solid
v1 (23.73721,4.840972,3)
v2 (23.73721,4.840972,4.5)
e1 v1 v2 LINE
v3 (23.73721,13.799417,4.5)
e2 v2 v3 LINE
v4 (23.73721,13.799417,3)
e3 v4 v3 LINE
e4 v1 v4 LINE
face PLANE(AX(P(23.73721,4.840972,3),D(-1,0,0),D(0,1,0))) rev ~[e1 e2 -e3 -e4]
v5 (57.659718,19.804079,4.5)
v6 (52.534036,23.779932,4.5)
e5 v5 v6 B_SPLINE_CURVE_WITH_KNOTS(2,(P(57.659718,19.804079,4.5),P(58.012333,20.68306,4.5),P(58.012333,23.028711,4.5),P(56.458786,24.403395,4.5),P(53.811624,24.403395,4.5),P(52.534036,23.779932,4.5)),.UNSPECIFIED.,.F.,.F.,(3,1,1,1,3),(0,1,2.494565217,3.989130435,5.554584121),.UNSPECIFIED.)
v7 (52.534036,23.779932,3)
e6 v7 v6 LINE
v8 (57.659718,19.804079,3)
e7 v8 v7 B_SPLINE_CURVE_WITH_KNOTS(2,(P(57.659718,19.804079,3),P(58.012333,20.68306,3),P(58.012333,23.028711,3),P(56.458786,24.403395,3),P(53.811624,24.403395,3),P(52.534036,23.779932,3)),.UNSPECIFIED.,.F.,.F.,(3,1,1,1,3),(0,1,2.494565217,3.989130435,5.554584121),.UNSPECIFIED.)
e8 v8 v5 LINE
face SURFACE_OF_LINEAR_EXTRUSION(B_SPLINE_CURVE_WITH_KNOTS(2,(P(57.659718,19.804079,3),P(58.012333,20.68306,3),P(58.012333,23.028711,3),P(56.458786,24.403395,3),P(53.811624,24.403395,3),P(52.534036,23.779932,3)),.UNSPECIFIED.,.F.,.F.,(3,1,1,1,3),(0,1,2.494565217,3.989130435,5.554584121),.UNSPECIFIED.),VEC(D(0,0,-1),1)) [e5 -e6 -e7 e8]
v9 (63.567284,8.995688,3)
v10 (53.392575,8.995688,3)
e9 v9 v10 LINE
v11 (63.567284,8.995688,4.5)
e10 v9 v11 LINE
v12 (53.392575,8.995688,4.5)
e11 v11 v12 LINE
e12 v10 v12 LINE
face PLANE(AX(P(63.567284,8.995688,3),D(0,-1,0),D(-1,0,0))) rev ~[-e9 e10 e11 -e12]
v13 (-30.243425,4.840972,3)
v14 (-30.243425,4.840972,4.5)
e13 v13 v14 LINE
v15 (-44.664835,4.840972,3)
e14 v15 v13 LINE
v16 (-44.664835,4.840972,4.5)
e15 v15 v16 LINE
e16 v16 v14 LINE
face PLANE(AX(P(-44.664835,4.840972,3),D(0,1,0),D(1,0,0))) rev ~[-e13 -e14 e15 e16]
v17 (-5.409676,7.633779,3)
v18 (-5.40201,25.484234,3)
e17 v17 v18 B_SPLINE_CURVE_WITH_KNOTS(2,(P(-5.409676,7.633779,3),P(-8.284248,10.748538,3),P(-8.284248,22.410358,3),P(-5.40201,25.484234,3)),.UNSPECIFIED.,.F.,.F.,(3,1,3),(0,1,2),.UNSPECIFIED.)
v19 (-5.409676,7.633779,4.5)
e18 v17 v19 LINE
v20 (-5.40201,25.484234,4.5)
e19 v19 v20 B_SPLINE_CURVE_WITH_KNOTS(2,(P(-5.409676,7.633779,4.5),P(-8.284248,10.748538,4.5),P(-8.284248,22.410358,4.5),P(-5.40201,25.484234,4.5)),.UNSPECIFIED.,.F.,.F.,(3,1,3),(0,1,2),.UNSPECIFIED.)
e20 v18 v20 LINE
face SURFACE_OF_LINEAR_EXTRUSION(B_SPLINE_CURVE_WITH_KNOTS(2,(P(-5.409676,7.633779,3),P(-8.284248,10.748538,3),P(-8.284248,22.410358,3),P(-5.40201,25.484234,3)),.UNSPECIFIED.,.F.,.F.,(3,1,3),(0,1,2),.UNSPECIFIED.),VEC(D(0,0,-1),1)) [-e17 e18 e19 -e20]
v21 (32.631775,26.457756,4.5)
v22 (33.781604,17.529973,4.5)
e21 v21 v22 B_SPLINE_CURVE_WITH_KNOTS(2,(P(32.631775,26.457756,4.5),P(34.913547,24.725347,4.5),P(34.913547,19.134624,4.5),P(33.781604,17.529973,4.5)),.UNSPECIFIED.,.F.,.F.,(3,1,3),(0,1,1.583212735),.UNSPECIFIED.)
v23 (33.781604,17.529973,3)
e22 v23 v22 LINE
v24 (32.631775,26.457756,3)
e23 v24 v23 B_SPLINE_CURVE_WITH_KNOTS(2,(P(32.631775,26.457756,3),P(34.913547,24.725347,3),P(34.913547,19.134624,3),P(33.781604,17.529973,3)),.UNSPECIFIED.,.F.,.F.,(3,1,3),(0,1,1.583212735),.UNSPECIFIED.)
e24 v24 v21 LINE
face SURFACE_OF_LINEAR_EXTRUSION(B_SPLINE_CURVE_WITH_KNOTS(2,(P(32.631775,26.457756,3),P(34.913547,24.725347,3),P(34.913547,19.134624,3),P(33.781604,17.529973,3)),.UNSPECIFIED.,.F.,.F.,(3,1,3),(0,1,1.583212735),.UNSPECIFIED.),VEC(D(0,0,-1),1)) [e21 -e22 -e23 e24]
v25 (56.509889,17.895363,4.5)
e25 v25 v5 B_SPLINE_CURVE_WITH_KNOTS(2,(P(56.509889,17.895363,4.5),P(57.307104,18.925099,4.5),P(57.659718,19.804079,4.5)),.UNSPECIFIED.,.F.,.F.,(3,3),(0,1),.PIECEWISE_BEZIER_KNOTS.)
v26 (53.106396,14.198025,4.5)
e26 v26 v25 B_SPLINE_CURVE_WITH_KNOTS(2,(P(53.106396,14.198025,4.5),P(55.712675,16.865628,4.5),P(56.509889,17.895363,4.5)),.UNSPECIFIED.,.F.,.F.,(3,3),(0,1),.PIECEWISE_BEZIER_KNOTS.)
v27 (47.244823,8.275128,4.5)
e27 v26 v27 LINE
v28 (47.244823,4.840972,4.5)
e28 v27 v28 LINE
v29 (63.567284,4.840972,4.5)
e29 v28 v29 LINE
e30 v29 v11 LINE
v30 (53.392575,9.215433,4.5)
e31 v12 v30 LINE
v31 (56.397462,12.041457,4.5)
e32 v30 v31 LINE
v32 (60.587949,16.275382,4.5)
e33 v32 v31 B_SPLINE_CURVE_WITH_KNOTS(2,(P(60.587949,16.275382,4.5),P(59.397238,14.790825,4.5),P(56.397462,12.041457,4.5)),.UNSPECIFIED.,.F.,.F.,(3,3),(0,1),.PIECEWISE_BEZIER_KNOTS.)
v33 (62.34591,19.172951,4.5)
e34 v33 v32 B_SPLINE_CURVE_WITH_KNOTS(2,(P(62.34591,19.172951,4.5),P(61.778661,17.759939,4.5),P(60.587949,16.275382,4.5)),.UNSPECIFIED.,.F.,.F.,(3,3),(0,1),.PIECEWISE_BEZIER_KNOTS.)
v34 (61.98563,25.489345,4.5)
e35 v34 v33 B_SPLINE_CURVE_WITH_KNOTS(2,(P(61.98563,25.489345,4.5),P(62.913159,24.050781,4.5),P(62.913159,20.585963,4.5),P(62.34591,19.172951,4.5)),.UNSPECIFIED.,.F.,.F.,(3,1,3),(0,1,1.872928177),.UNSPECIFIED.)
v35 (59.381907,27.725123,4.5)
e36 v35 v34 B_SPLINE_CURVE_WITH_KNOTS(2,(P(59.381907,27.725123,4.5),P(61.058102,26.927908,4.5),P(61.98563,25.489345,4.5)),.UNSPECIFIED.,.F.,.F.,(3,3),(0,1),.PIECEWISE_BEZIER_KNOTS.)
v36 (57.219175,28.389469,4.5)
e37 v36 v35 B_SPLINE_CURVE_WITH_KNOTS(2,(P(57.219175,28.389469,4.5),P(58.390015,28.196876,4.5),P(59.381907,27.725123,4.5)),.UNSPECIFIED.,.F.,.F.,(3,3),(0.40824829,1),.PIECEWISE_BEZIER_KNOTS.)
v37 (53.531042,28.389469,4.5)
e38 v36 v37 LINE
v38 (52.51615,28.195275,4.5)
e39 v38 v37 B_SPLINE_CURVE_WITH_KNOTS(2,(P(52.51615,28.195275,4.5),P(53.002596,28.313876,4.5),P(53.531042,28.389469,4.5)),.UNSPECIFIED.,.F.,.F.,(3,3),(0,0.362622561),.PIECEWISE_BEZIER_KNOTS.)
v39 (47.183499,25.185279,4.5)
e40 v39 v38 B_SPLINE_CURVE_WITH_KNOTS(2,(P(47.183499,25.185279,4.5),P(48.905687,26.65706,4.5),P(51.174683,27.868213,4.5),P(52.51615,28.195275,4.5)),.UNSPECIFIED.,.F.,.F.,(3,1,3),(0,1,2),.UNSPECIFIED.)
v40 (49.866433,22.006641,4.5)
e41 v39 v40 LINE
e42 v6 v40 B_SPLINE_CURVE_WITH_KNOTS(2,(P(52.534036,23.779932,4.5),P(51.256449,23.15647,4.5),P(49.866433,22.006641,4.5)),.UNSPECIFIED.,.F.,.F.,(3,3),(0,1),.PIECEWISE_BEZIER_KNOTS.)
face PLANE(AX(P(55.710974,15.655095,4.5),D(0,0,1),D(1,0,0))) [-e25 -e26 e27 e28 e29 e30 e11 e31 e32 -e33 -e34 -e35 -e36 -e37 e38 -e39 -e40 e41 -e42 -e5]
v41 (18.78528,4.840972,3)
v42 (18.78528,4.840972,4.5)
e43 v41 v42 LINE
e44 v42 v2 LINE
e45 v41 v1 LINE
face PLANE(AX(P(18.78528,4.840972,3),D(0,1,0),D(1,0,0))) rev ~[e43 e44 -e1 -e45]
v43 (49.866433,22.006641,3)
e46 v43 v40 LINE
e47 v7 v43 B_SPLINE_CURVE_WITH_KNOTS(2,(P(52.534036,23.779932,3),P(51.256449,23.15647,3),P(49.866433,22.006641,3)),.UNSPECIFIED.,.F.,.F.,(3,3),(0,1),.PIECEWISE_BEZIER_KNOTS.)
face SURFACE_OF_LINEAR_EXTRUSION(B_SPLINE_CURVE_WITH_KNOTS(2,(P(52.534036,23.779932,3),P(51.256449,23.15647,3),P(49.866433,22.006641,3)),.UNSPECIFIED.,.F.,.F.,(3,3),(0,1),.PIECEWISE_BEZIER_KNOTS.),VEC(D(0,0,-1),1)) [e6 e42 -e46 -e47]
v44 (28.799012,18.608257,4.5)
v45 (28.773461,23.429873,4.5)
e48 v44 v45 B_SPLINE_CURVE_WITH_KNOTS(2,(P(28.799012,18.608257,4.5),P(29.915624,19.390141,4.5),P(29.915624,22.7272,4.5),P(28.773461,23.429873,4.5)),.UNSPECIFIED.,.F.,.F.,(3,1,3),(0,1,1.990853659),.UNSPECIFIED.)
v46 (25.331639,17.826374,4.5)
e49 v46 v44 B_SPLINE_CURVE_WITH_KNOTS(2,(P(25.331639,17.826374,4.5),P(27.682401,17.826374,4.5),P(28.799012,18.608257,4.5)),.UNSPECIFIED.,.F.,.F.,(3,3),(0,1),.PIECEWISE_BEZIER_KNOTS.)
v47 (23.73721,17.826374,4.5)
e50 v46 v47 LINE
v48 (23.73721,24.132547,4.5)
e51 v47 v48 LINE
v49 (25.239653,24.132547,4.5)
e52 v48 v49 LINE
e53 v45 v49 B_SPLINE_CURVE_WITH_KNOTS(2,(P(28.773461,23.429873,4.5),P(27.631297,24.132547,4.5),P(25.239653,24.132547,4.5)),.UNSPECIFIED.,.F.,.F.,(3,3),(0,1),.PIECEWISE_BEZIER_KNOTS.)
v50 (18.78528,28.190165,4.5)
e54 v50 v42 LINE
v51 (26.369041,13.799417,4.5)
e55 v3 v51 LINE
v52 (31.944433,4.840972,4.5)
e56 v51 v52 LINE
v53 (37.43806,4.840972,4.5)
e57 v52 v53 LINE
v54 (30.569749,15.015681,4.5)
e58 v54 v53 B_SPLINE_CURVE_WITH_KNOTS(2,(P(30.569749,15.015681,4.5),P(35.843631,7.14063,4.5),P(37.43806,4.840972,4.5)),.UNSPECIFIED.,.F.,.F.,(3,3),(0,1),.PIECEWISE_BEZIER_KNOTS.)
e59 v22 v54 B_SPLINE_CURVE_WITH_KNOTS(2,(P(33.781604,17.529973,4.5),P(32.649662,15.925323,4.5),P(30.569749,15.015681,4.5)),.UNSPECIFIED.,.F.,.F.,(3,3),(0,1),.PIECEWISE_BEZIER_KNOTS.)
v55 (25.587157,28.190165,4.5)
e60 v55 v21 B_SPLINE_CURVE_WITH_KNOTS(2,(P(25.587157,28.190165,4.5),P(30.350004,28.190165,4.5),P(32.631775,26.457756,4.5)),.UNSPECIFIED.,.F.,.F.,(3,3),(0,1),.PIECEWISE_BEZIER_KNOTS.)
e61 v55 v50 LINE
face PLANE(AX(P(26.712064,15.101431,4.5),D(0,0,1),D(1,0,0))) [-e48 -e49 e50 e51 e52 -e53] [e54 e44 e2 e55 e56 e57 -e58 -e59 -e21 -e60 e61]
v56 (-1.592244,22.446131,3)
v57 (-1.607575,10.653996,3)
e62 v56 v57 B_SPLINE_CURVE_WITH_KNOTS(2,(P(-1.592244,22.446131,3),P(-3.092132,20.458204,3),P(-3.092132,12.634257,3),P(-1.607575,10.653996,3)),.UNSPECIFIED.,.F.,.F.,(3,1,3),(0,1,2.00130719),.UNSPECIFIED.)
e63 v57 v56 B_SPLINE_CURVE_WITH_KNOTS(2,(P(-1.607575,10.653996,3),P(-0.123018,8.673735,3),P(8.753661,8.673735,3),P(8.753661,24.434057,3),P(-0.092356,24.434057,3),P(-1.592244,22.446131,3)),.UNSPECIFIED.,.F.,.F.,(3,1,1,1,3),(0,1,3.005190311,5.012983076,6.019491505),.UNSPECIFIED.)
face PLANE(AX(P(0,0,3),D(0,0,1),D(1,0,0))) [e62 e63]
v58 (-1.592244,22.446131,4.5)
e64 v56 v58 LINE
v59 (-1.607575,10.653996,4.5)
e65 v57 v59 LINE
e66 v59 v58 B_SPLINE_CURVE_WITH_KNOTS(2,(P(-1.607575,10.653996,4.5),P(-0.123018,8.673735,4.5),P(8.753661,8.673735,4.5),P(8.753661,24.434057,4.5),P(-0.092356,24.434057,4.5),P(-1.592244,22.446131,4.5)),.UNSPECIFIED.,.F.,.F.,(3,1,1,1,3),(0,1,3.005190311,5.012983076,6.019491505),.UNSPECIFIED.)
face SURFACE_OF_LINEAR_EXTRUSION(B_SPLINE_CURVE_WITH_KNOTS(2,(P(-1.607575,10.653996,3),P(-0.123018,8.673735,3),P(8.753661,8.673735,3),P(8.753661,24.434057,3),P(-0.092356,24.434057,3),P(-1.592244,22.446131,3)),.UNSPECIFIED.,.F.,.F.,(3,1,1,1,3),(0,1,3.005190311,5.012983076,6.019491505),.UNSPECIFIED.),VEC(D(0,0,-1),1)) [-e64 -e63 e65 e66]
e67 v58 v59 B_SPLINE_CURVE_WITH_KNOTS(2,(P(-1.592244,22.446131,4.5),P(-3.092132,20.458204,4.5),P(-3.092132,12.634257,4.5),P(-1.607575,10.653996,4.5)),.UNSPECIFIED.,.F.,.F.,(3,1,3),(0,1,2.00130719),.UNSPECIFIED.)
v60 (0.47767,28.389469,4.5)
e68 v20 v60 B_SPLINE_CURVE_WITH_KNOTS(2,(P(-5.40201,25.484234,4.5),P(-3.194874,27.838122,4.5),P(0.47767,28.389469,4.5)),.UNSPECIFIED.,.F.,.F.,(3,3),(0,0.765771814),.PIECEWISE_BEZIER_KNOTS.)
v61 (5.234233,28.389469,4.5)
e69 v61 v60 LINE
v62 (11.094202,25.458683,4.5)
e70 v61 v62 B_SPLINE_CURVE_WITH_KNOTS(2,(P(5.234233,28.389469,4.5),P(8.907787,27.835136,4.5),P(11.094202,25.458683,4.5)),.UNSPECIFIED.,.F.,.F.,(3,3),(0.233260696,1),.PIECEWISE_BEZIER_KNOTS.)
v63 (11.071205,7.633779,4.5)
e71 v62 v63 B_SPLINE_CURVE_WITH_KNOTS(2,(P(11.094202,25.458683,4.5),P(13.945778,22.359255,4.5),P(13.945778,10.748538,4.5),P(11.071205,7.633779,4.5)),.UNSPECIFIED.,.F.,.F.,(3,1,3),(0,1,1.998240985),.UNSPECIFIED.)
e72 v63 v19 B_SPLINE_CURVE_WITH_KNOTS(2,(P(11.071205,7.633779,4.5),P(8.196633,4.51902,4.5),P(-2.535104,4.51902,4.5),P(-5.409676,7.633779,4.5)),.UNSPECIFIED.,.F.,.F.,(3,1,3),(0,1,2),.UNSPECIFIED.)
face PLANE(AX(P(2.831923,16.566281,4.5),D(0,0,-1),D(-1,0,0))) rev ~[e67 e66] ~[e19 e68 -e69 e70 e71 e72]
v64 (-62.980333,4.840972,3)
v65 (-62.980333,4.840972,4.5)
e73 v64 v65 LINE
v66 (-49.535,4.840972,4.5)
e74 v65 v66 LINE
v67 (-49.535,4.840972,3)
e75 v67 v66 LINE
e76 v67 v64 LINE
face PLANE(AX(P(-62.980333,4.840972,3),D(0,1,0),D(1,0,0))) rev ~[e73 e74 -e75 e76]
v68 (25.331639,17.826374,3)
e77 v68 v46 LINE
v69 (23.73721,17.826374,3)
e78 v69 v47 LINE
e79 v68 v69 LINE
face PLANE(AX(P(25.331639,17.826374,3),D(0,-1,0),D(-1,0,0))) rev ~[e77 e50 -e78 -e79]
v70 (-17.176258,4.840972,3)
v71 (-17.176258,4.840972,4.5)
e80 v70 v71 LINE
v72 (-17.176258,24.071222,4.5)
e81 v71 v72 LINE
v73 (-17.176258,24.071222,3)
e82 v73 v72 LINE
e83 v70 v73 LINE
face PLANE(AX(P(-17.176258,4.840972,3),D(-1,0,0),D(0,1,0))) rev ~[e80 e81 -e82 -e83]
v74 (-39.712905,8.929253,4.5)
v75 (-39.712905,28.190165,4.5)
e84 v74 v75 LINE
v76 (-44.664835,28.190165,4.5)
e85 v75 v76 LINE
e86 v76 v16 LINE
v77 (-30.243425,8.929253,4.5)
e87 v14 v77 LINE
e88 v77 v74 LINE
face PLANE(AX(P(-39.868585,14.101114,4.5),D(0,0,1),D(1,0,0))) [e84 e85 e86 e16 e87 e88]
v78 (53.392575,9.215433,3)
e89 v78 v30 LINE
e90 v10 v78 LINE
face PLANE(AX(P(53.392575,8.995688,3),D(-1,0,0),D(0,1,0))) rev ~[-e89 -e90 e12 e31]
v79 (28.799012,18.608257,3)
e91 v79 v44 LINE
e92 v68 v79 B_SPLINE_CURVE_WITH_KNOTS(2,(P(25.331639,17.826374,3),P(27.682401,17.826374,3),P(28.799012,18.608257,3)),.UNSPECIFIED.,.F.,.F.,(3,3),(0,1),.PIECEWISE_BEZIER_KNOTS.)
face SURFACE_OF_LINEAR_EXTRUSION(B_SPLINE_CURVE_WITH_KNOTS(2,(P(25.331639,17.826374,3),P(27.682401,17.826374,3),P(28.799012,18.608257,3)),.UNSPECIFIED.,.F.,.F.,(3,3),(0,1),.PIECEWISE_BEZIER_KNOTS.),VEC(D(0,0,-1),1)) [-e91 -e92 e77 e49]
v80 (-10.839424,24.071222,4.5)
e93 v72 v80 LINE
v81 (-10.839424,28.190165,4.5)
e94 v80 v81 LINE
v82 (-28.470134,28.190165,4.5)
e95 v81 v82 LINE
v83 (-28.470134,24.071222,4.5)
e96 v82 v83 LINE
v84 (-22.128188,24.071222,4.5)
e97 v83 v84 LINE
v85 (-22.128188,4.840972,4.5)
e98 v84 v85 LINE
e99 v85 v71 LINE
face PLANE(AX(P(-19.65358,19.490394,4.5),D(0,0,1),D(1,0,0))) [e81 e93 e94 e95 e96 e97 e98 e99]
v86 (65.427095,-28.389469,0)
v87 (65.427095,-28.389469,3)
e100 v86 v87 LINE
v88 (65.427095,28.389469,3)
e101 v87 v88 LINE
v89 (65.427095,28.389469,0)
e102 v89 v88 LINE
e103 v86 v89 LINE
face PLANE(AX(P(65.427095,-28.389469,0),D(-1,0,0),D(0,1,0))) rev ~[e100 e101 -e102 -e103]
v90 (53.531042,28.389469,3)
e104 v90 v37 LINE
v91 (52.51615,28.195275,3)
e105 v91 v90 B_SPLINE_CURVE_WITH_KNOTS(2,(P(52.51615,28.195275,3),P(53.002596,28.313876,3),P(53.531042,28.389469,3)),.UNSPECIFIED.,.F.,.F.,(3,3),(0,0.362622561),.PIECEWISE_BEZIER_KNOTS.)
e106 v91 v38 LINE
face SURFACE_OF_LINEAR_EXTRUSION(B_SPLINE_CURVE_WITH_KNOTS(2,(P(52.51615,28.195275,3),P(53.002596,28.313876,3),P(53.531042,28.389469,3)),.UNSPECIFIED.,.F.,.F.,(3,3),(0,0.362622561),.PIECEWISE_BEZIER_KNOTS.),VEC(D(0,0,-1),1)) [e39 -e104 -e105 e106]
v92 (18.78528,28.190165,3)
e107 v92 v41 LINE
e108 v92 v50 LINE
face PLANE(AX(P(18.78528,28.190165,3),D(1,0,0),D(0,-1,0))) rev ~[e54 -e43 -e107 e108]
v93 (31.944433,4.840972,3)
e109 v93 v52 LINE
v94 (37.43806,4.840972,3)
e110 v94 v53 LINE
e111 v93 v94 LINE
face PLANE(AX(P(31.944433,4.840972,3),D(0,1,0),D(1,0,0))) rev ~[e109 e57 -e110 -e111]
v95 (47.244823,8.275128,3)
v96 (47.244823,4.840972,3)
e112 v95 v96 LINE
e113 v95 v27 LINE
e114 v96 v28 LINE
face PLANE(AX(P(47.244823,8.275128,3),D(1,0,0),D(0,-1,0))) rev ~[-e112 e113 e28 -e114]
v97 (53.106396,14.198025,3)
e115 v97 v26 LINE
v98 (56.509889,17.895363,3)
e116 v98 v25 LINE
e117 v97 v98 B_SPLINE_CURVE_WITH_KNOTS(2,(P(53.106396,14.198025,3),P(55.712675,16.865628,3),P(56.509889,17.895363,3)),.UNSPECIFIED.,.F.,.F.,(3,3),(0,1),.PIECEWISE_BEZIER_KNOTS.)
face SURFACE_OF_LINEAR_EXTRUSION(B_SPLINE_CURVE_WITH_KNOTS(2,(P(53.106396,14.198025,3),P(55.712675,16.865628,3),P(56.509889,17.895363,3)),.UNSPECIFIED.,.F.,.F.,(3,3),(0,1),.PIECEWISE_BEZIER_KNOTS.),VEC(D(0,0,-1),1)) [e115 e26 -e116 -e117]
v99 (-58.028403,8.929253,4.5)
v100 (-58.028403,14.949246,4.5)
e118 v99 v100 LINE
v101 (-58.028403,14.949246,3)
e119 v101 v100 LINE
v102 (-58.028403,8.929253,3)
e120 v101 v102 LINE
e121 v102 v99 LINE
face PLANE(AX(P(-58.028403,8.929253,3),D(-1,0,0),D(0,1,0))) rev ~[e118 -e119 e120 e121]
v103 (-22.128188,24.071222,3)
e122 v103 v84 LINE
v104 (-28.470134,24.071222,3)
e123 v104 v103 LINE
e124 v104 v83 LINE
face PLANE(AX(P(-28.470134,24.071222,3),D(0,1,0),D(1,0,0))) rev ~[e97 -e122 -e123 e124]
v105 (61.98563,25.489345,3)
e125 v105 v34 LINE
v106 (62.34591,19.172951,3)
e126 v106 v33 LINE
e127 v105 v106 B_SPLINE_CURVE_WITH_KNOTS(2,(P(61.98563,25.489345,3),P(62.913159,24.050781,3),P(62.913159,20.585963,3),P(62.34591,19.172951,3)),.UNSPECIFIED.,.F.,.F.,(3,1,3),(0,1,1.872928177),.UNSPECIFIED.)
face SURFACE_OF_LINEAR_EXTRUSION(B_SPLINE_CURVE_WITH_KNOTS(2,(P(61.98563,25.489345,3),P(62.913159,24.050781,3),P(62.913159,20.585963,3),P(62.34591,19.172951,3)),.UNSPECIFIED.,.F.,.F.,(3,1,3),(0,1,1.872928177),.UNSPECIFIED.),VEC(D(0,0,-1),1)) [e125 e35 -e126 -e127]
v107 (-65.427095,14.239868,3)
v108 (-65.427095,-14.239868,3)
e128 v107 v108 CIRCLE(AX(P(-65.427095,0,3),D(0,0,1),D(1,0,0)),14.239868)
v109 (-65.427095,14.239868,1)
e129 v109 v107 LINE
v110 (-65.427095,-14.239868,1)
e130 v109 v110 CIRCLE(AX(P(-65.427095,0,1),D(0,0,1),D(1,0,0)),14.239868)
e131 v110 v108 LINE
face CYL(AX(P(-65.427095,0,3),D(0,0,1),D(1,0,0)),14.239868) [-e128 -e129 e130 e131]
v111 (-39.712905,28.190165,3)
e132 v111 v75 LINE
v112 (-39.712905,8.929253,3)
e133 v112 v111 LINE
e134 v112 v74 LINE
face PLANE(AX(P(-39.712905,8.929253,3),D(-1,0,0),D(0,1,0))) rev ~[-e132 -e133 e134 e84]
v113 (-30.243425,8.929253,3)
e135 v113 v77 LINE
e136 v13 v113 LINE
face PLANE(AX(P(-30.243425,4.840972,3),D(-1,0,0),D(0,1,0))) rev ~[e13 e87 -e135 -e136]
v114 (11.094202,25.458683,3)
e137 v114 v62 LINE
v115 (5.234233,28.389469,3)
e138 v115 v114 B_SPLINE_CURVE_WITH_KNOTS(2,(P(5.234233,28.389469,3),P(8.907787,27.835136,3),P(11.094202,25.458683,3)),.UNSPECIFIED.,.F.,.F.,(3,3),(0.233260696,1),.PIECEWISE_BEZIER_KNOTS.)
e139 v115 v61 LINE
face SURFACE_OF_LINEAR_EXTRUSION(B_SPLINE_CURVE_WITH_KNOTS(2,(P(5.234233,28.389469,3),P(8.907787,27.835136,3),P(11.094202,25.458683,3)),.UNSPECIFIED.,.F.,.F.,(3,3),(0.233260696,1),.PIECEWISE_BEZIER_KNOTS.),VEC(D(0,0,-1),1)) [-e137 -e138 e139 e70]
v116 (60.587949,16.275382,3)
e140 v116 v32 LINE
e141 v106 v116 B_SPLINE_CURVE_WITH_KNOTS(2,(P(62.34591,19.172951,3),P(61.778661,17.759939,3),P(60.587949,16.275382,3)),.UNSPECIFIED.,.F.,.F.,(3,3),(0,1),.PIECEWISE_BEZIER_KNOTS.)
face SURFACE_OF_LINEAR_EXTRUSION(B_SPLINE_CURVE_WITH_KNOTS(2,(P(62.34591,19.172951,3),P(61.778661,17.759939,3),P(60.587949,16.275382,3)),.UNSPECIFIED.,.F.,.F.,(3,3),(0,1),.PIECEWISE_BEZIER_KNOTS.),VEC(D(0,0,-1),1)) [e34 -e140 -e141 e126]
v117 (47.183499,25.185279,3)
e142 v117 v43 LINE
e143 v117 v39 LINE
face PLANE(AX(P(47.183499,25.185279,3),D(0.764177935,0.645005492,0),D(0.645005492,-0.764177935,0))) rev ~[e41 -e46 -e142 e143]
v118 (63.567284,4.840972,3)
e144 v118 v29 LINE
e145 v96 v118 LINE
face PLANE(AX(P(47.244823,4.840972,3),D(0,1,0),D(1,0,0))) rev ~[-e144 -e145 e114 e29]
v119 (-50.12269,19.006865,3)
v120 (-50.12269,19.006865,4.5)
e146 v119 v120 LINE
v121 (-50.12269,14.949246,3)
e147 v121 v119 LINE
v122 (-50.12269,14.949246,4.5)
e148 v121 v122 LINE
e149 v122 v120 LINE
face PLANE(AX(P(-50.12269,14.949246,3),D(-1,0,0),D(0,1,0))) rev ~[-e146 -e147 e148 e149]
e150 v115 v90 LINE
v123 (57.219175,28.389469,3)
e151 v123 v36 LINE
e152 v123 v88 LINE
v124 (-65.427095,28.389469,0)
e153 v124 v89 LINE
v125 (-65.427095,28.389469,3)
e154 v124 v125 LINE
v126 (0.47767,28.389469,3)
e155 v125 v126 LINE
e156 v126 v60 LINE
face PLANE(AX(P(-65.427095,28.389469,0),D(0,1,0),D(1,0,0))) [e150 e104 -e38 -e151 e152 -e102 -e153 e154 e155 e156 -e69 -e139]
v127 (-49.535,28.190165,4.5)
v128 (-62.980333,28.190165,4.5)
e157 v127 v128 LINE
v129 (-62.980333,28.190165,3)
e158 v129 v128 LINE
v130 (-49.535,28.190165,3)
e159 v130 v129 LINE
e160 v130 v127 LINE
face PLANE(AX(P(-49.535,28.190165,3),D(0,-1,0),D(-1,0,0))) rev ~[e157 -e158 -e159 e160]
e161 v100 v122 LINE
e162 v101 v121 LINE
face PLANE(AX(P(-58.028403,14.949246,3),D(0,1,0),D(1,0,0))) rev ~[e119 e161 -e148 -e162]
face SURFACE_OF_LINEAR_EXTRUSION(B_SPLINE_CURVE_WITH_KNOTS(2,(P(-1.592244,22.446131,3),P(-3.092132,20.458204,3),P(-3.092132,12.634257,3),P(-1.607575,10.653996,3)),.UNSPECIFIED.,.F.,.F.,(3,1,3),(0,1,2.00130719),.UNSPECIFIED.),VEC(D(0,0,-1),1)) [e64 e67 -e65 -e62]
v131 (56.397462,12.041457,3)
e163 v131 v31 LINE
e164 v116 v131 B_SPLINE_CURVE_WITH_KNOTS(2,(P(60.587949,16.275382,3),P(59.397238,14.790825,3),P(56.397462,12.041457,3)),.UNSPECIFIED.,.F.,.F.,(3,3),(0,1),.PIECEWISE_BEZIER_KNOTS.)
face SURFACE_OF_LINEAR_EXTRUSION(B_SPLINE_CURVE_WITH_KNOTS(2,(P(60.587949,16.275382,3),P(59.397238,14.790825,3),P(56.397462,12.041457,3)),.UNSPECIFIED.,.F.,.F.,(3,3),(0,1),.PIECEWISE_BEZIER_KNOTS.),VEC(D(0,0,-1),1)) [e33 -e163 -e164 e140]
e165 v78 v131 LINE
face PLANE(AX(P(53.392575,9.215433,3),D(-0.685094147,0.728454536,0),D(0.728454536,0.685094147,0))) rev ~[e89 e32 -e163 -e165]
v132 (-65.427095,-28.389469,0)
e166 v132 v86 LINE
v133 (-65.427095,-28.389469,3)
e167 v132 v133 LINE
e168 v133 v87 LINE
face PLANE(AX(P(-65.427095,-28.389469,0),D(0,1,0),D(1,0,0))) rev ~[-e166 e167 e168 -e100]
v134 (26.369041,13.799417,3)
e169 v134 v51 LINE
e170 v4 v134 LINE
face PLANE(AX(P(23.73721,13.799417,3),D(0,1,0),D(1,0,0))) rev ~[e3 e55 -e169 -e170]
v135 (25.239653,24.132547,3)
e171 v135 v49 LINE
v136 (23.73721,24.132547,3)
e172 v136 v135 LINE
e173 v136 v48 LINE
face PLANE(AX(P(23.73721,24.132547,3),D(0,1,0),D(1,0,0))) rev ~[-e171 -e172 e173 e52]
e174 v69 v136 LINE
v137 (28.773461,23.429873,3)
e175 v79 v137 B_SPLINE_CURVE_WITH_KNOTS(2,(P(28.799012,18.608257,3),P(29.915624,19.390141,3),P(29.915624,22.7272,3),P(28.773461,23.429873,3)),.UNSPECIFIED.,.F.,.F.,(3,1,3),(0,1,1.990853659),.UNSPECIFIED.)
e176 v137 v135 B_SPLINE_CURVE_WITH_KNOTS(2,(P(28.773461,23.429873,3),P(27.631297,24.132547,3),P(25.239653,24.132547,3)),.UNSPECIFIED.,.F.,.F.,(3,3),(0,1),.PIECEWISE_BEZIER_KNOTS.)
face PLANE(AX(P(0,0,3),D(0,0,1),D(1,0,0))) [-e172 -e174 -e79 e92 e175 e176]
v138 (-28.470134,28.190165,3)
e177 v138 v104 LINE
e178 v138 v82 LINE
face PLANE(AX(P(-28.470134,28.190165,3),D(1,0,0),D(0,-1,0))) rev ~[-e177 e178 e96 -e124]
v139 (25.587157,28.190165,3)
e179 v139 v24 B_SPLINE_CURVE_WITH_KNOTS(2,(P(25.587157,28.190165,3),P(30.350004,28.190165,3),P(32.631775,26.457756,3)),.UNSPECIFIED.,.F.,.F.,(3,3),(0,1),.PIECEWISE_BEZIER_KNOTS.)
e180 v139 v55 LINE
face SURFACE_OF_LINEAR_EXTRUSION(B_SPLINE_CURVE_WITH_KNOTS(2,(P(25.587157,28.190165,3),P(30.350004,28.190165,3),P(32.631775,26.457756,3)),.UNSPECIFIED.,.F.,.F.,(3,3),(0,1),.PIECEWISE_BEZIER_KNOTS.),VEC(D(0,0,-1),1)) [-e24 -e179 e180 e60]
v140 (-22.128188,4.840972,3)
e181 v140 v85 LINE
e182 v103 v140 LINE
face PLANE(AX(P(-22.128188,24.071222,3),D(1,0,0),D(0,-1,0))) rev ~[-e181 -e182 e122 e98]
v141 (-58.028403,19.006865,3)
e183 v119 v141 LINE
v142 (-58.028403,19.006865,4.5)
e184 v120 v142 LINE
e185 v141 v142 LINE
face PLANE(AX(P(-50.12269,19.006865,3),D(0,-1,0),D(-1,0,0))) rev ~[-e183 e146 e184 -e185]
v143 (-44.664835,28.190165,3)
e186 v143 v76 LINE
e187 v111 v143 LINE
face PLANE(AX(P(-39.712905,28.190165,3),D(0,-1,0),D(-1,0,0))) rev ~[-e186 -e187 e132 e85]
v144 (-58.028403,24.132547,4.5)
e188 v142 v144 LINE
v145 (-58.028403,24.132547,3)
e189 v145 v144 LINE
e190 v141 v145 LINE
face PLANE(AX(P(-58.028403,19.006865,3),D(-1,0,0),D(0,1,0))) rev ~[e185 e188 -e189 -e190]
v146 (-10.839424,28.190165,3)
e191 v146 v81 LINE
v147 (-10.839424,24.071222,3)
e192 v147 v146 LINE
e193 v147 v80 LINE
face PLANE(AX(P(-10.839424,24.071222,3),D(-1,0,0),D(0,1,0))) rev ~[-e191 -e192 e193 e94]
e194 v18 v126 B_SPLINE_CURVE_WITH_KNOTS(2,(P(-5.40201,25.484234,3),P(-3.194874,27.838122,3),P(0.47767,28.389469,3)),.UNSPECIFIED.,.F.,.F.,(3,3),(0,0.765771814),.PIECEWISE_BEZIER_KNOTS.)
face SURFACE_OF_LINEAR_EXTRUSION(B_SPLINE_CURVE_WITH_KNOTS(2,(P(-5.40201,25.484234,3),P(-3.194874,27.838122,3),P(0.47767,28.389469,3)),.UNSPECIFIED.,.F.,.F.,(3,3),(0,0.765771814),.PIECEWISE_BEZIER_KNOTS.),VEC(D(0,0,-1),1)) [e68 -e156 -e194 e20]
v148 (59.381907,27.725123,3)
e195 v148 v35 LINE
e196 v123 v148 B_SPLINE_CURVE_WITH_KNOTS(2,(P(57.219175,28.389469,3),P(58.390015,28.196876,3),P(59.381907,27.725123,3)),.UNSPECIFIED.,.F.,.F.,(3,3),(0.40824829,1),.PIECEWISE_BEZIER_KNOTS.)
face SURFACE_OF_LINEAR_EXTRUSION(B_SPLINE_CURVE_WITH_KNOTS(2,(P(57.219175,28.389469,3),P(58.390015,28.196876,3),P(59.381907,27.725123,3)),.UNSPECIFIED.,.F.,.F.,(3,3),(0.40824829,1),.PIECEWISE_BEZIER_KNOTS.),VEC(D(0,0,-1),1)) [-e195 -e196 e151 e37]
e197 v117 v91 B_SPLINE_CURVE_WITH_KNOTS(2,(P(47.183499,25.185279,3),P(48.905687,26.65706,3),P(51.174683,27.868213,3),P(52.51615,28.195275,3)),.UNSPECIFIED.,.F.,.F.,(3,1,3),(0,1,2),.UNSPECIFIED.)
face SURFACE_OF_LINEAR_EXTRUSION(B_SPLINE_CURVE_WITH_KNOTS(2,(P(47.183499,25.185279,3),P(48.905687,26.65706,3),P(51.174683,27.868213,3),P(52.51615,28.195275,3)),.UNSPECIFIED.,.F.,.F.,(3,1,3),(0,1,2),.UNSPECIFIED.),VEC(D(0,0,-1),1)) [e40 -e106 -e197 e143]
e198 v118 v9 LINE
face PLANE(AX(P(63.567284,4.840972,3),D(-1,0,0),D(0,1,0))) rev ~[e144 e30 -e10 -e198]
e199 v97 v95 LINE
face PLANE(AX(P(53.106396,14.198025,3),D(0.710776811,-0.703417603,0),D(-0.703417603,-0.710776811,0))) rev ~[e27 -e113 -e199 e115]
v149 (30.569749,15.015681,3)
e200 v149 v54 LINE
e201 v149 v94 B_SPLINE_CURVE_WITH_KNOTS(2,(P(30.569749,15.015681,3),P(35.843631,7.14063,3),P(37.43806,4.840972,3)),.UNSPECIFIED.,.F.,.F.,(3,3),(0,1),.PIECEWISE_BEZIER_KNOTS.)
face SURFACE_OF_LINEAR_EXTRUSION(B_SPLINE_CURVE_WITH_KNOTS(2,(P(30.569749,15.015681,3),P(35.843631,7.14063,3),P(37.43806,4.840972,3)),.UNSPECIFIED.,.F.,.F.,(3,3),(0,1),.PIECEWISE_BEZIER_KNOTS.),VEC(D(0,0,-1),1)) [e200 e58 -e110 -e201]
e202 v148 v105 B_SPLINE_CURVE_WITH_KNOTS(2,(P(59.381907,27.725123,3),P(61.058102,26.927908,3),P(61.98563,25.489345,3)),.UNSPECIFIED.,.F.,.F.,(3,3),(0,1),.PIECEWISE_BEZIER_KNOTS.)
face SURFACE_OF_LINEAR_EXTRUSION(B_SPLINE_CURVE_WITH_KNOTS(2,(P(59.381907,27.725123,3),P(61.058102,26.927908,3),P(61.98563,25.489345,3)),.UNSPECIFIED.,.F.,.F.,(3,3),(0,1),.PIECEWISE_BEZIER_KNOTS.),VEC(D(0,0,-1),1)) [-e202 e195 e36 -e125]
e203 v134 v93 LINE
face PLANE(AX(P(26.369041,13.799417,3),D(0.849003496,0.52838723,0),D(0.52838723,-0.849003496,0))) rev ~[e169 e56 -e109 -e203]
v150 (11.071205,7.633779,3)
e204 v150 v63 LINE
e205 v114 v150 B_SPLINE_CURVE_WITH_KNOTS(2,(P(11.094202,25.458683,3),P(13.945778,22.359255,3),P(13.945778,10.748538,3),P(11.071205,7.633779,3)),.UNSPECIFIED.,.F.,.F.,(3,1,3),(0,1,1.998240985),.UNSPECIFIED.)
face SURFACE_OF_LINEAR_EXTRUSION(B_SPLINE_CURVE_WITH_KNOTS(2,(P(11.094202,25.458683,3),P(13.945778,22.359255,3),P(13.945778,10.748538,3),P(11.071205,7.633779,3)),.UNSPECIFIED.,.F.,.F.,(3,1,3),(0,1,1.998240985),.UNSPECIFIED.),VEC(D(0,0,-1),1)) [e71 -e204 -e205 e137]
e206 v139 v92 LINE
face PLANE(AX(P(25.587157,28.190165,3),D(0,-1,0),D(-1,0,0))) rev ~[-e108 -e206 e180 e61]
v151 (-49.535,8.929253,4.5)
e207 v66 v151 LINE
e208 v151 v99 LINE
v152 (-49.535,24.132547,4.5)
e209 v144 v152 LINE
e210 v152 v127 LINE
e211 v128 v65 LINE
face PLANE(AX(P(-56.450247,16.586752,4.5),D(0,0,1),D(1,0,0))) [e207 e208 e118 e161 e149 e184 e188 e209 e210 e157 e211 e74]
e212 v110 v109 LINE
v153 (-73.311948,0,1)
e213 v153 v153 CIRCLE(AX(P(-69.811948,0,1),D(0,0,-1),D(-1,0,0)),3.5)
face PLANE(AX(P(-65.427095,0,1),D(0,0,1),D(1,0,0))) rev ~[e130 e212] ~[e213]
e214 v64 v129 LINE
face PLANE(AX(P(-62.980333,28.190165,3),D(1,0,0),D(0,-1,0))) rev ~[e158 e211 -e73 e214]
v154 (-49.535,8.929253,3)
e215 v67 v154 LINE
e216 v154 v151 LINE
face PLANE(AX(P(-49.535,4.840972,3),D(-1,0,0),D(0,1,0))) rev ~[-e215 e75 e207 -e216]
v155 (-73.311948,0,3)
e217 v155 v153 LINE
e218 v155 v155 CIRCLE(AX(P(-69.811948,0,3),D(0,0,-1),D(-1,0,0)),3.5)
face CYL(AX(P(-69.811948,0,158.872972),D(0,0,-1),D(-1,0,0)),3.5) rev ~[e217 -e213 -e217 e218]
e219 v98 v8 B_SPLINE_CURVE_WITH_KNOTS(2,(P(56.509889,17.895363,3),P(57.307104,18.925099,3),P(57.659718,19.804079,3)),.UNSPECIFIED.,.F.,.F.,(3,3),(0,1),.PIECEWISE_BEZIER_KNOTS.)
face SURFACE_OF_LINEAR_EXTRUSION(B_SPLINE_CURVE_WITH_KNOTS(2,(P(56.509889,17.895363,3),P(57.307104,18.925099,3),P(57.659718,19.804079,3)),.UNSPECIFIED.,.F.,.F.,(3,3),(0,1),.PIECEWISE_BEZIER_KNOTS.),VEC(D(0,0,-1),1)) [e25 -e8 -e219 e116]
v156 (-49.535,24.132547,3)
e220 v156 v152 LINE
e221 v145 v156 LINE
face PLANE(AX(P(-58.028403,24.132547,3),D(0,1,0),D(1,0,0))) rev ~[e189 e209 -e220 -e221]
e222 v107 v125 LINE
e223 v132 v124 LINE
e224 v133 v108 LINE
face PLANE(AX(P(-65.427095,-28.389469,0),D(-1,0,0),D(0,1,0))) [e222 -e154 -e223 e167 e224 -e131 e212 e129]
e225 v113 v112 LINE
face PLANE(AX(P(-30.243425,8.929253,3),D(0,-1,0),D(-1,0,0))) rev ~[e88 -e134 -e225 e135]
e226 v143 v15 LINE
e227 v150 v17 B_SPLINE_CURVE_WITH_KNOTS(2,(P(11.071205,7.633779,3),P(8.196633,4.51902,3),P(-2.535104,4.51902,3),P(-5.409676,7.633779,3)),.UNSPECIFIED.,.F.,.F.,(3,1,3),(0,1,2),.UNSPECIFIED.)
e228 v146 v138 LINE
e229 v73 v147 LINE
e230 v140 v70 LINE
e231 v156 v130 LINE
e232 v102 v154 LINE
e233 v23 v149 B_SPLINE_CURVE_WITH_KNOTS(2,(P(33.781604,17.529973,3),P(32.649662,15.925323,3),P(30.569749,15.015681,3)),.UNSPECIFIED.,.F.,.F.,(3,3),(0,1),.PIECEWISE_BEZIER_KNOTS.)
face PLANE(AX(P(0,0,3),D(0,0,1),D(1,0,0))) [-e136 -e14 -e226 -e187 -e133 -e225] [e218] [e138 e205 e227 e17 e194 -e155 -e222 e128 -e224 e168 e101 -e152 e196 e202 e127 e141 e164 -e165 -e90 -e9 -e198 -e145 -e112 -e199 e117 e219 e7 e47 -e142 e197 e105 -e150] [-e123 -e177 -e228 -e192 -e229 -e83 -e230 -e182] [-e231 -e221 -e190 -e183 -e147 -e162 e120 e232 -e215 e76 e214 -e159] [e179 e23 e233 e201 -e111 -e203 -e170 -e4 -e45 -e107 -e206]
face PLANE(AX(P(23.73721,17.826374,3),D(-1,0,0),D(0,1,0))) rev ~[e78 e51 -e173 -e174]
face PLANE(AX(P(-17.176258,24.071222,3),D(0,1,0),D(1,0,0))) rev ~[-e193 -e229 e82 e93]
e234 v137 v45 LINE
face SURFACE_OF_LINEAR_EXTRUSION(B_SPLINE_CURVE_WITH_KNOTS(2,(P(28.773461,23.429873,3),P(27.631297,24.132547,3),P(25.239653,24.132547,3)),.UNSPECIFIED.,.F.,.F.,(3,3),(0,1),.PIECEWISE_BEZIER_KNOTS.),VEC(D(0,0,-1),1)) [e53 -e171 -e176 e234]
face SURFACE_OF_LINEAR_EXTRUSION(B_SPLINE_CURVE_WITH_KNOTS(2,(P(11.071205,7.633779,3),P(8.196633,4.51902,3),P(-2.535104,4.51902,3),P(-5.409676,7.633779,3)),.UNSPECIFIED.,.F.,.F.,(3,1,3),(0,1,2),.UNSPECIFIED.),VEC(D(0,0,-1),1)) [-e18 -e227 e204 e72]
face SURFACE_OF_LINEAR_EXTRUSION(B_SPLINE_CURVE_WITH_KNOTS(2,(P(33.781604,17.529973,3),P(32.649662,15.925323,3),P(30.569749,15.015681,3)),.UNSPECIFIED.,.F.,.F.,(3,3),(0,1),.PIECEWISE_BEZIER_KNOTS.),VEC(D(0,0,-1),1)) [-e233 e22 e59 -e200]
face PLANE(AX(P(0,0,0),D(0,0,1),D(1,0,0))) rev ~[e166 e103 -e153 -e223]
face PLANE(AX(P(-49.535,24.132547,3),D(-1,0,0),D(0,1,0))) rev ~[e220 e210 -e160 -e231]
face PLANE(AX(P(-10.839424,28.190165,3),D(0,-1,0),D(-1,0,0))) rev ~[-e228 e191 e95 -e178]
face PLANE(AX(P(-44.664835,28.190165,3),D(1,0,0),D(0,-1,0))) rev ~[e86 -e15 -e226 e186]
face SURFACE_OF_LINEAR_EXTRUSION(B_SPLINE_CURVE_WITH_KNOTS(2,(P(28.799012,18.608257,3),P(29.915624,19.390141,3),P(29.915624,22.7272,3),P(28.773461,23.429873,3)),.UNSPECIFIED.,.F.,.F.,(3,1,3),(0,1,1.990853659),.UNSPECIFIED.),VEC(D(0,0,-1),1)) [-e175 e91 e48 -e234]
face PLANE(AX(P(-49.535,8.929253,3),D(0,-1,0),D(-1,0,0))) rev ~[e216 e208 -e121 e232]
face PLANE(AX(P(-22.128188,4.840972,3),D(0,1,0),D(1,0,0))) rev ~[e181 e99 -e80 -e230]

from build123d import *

# Parameters (mm, degrees)
F0_W     = 130.8541893959
F0_H     = 56.7789375782
F1_DEPTH = 3
F3_DEPTH = 1.5
F4_R     = 14.2398683788
F5_DEPTH = 2
F7_D     = 7


# Not quite as in the source:
# - a feature names something its author has since deleted; it is built from what else it names


with BuildPart() as f1:
    # F0 (on Top) → F1 (new body)
    with BuildSketch(Plane.XY):
        Rectangle(F0_W, F0_H)
    extrude(amount=F1_DEPTH)

    # F2 (on face) → F3 (join)
    with BuildSketch(Plane.XY.offset(3)):
        with BuildLine():
            Line((57.2191747598, 28.3894687891), (53.5310418569, 28.3894687891))
            add(Edge.make_bspline(
                [(52.5161502643, 28.1952754595), (53.0025964919, 28.3138756826), (53.5310418569, 28.3894687891)],
                knots=[0, 0, 0, 0.3626225608, 0.3626225608, 0.3626225608], degree=2))
            add(Edge.make_bspline(
                [(50.0401853118, 27.2626364423), (51.1746831848, 27.8682130096), (52.5161502643, 28.1952754595)],
                knots=[0, 0, 0, 1, 1, 1], degree=2))
            add(Edge.make_bspline(
                [(47.1834992262, 25.1852788506), (48.9056874388, 26.657059875), (50.0401853118, 27.2626364423)],
                knots=[0, 0, 0, 1, 1, 1], degree=2))
            Line((47.1834992262, 25.1852788506), (49.8664333853, 22.0066406659))
            add(Edge.make_bspline(
                [(52.534036492, 23.7799323863), (51.2564487973, 23.1564695912), (49.8664333853, 22.0066406659)],
                knots=[0, 0, 0, 1, 1, 1], degree=2))
            add(Edge.make_bspline(
                [(55.1658671433, 24.4033951813), (53.8116241868, 24.4033951813), (52.534036492, 23.7799323863)],
                knots=[0, 0, 0, 1, 1, 1], degree=2))
            add(Edge.make_bspline(
                [(57.2355592089, 23.7160530015), (56.4587858905, 24.4033951813), (55.1658671433, 24.4033951813)],
                knots=[0, 0, 0, 1, 1, 1], degree=2))
            add(Edge.make_bspline(
                [(58.0123325273, 21.6233643575), (58.0123325273, 23.0287108217), (57.2355592089, 23.7160530015)],
                knots=[0, 0, 0, 1, 1, 1], degree=2))
            add(Edge.make_bspline(
                [(57.6597183236, 19.8040794801), (58.0123325273, 20.6830598141), (58.0123325273, 21.6233643575)],
                knots=[0, 0, 0, 1, 1, 1], degree=2))
            add(Edge.make_bspline(
                [(56.5098893983, 17.8953634641), (57.3071041198, 18.9250991461), (57.6597183236, 19.8040794801)],
                knots=[0, 0, 0, 1, 1, 1], degree=2))
            add(Edge.make_bspline(
                [(53.1063957793, 14.1980246753), (55.7126746767, 16.865627782), (56.5098893983, 17.8953634641)],
                knots=[0, 0, 0, 1, 1, 1], degree=2))
            Line((53.1063957793, 14.1980246753), (47.2448234356, 8.2751281222))
            Line((47.2448234356, 8.2751281222), (47.2448234356, 4.8409723986))
            Line((47.2448234356, 4.8409723986), (63.5672838243, 4.8409723986))
            Line((63.5672838243, 4.8409723986), (63.5672838243, 8.9956875821))
            Line((63.5672838243, 8.9956875821), (53.3925754229, 8.9956875821))
            Line((53.3925754229, 8.9956875821), (53.3925754229, 9.2154326656))
            Line((53.3925754229, 9.2154326656), (56.3974616811, 12.0414566465))
            add(Edge.make_bspline(
                [(60.58794932, 16.2753822671), (59.3972375885, 14.7908253657), (56.3974616811, 12.0414566465)],
                knots=[0, 0, 0, 1, 1, 1], degree=2))
            add(Edge.make_bspline(
                [(62.3459099881, 19.1729511588), (61.7786610516, 17.7599391684), (60.58794932, 16.2753822671)],
                knots=[0, 0, 0, 1, 1, 1], degree=2))
            add(Edge.make_bspline(
                [(62.9131589246, 22.2008339955), (62.9131589246, 20.5859631493), (62.3459099881, 19.1729511588)],
                knots=[0, 0, 0, 1, 1, 1], degree=2))
            add(Edge.make_bspline(
                [(61.9856302581, 25.4893447219), (62.9131589246, 24.0507809776), (62.9131589246, 22.2008339955)],
                knots=[0, 0, 0, 1, 1, 1], degree=2))
            add(Edge.make_bspline(
                [(59.3819065362, 27.7251231878), (61.0581015917, 26.9279084663), (61.9856302581, 25.4893447219)],
                knots=[0, 0, 0, 1, 1, 1], degree=2))
            add(Edge.make_bspline(
                [(57.2191747598, 28.3894687891), (58.3900152465, 28.1968763622), (59.3819065362, 27.7251231878)],
                knots=[0.4082482905, 0.4082482905, 0.4082482905, 1, 1, 1], degree=2))
        make_face()
        with BuildLine():
            Line((23.7372098514, 4.8409723986), (23.7372098514, 13.7994173145))
            Line((23.7372098514, 13.7994173145), (26.3690405026, 13.7994173145))
            Line((26.3690405026, 13.7994173145), (31.9444332027, 4.8409723986))
            Line((31.9444332027, 4.8409723986), (37.4380602903, 4.8409723986))
            add(Edge.make_bspline(
                [(30.5697488431, 15.0156808), (35.8436308472, 7.1406302493), (37.4380602903, 4.8409723986)],
                knots=[0, 0, 0, 1, 1, 1], degree=2))
            add(Edge.make_bspline(
                [(33.7816043078, 17.5299733833), (32.6496616103, 15.9253232387), (30.5697488431, 15.0156808)],
                knots=[0, 0, 0, 1, 1, 1], degree=2))
            add(Edge.make_bspline(
                [(34.9135470054, 21.194094892), (34.9135470054, 19.134623528), (33.7816043078, 17.5299733833)],
                knots=[0, 0, 0, 1, 1, 1], degree=2))
            add(Edge.make_bspline(
                [(32.6317753825, 26.4577561946), (34.9135470054, 24.7253472804), (34.9135470054, 21.194094892)],
                knots=[0, 0, 0, 1, 1, 1], degree=2))
            add(Edge.make_bspline(
                [(25.5871568334, 28.1901651087), (30.3500037596, 28.1901651087), (32.6317753825, 26.4577561946)],
                knots=[0, 0, 0, 1, 1, 1], degree=2))
            Line((25.5871568334, 28.1901651087), (18.7852799463, 28.1901651087))
            Line((18.7852799463, 28.1901651087), (18.7852799463, 4.8409723986))
            Line((18.7852799463, 4.8409723986), (23.7372098514, 4.8409723986))
        make_face()
        with BuildLine():
            Line((25.3316392945, 17.8263737285), (23.7372098514, 17.8263737285))
            Line((23.7372098514, 17.8263737285), (23.7372098514, 24.13254659))
            Line((23.7372098514, 24.13254659), (25.2396529804, 24.13254659))
            add(Edge.make_bspline(
                [(28.7734605442, 23.4298733579), (27.6312971451, 24.13254659), (25.2396529804, 24.13254659)],
                knots=[0, 0, 0, 1, 1, 1], degree=2))
            add(Edge.make_bspline(
                [(29.9156239434, 21.0663361225), (29.9156239434, 22.7272001258), (28.7734605442, 23.4298733579)],
                knots=[0, 0, 0, 1, 1, 1], degree=2))
            add(Edge.make_bspline(
                [(28.7990122981, 18.6082573977), (29.9156239434, 19.390141067), (29.9156239434, 21.0663361225)],
                knots=[0, 0, 0, 1, 1, 1], degree=2))
            add(Edge.make_bspline(
                [(25.3316392945, 17.8263737285), (27.6824006529, 17.8263737285), (28.7990122981, 18.6082573977)],
                knots=[0, 0, 0, 1, 1, 1], degree=2))
        make_face(mode=Mode.SUBTRACT)
        with BuildLine():
            add(Edge.make_bspline(
                [(13.9457777584, 16.5487860337), (13.9457777584, 10.7485378994), (11.0712054452, 7.6337790995)],
                knots=[0, 0, 0, 1, 1, 1], degree=2))
            add(Edge.make_bspline(
                [(11.0942020237, 25.4586826172), (13.9457777584, 22.3592548697), (13.9457777584, 16.5487860337)],
                knots=[0, 0, 0, 1, 1, 1], degree=2))
            add(Edge.make_bspline(
                [(5.2342333213, 28.3894687891), (8.9077868298, 27.8351356909), (11.0942020237, 25.4586826172)],
                knots=[0.2332606961, 0.2332606961, 0.2332606961, 1, 1, 1], degree=2))
            Line((5.2342333213, 28.3894687891), (0.4776699233, 28.3894687891))
            add(Edge.make_bspline(
                [(-5.4020102915, 25.4842343711), (-3.1948737915, 27.8381219683), (0.4776699233, 28.3894687891)],
                knots=[0, 0, 0, 0.7657718145, 0.7657718145, 0.7657718145], degree=2))
            add(Edge.make_bspline(
                [(-8.284248131, 16.5794481384), (-8.284248131, 22.4103583775), (-5.4020102915, 25.4842343711)],
                knots=[0, 0, 0, 1, 1, 1], degree=2))
            add(Edge.make_bspline(
                [(-5.4096758177, 7.6337790995), (-8.284248131, 10.7485378994), (-8.284248131, 16.5794481384)],
                knots=[0, 0, 0, 1, 1, 1], degree=2))
            add(Edge.make_bspline(
                [(2.8307648137, 4.5190202995), (-2.5351035044, 4.5190202995), (-5.4096758177, 7.6337790995)],
                knots=[0, 0, 0, 1, 1, 1], degree=2))
            add(Edge.make_bspline(
                [(11.0712054452, 7.6337790995), (8.1966331319, 4.5190202995), (2.8307648137, 4.5190202995)],
                knots=[0, 0, 0, 1, 1, 1], degree=2))
        make_face()
        with BuildLine():
            add(Edge.make_bspline(
                [(-3.0921317393, 16.5487860337), (-3.0921317393, 12.6342573369), (-1.607574838, 10.65399641)],
                knots=[0, 0, 0, 1, 1, 1], degree=2))
            add(Edge.make_bspline(
                [(-1.5922437857, 22.4461308329), (-3.0921317393, 20.4582043798), (-3.0921317393, 16.5487860337)],
                knots=[0, 0, 0, 1, 1, 1], degree=2))
            add(Edge.make_bspline(
                [(2.8614269184, 24.434057286), (-0.092355832, 24.434057286), (-1.5922437857, 22.4461308329)],
                knots=[0, 0, 0, 1, 1, 1], degree=2))
            add(Edge.make_bspline(
                [(8.7536613668, 16.5487860337), (8.7536613668, 24.434057286), (2.8614269184, 24.434057286)],
                knots=[0, 0, 0, 1, 1, 1], degree=2))
            add(Edge.make_bspline(
                [(2.8307648137, 8.673735483), (8.7536613668, 8.673735483), (8.7536613668, 16.5487860337)],
                knots=[0, 0, 0, 1, 1, 1], degree=2))
            add(Edge.make_bspline(
                [(-1.607574838, 10.65399641), (-0.1230179366, 8.673735483), (2.8307648137, 8.673735483)],
                knots=[0, 0, 0, 1, 1, 1], degree=2))
        make_face(mode=Mode.SUBTRACT)
        Polygon((-22.1281883918, 4.8409723986), (-17.1762584868, 4.8409723986), (-17.1762584868, 24.0712223807), (-10.8394235206, 24.0712223807), (-10.8394235206, 28.1901651087), (-28.4701337088, 28.1901651087), (-28.4701337088, 24.0712223807), (-22.1281883918, 24.0712223807), align=None)
        Polygon((-44.664835328, 28.1901651087), (-44.664835328, 4.8409723986), (-30.2434254291, 4.8409723986), (-30.2434254291, 8.929253022), (-39.712905423, 8.929253022), (-39.712905423, 28.1901651087), align=None)
        Polygon((-62.9803325206, 4.8409723986), (-49.5349996205, 4.8409723986), (-49.5349996205, 8.929253022), (-58.0284026155, 8.929253022), (-58.0284026155, 14.9492462399), (-50.1226899601, 14.9492462399), (-50.1226899601, 19.0068647585), (-58.0284026155, 19.0068647585), (-58.0284026155, 24.13254659), (-49.5349996205, 24.13254659), (-49.5349996205, 28.1901651087), (-62.9803325206, 28.1901651087), align=None)
    extrude(amount=F3_DEPTH)

    # F4 (on face) → F5 (join)
    with BuildSketch(Plane.XY.offset(3)):
        with Locations((-65.427094698, 0)):
            Circle(F4_R)
    extrude(amount=-F5_DEPTH)

    # F7 (through all)
    with Locations(Plane.XY.offset(3)):
        with Locations((-69.8119476438, 0)):
            Hole(F7_D / 2)


solid = f1.part
